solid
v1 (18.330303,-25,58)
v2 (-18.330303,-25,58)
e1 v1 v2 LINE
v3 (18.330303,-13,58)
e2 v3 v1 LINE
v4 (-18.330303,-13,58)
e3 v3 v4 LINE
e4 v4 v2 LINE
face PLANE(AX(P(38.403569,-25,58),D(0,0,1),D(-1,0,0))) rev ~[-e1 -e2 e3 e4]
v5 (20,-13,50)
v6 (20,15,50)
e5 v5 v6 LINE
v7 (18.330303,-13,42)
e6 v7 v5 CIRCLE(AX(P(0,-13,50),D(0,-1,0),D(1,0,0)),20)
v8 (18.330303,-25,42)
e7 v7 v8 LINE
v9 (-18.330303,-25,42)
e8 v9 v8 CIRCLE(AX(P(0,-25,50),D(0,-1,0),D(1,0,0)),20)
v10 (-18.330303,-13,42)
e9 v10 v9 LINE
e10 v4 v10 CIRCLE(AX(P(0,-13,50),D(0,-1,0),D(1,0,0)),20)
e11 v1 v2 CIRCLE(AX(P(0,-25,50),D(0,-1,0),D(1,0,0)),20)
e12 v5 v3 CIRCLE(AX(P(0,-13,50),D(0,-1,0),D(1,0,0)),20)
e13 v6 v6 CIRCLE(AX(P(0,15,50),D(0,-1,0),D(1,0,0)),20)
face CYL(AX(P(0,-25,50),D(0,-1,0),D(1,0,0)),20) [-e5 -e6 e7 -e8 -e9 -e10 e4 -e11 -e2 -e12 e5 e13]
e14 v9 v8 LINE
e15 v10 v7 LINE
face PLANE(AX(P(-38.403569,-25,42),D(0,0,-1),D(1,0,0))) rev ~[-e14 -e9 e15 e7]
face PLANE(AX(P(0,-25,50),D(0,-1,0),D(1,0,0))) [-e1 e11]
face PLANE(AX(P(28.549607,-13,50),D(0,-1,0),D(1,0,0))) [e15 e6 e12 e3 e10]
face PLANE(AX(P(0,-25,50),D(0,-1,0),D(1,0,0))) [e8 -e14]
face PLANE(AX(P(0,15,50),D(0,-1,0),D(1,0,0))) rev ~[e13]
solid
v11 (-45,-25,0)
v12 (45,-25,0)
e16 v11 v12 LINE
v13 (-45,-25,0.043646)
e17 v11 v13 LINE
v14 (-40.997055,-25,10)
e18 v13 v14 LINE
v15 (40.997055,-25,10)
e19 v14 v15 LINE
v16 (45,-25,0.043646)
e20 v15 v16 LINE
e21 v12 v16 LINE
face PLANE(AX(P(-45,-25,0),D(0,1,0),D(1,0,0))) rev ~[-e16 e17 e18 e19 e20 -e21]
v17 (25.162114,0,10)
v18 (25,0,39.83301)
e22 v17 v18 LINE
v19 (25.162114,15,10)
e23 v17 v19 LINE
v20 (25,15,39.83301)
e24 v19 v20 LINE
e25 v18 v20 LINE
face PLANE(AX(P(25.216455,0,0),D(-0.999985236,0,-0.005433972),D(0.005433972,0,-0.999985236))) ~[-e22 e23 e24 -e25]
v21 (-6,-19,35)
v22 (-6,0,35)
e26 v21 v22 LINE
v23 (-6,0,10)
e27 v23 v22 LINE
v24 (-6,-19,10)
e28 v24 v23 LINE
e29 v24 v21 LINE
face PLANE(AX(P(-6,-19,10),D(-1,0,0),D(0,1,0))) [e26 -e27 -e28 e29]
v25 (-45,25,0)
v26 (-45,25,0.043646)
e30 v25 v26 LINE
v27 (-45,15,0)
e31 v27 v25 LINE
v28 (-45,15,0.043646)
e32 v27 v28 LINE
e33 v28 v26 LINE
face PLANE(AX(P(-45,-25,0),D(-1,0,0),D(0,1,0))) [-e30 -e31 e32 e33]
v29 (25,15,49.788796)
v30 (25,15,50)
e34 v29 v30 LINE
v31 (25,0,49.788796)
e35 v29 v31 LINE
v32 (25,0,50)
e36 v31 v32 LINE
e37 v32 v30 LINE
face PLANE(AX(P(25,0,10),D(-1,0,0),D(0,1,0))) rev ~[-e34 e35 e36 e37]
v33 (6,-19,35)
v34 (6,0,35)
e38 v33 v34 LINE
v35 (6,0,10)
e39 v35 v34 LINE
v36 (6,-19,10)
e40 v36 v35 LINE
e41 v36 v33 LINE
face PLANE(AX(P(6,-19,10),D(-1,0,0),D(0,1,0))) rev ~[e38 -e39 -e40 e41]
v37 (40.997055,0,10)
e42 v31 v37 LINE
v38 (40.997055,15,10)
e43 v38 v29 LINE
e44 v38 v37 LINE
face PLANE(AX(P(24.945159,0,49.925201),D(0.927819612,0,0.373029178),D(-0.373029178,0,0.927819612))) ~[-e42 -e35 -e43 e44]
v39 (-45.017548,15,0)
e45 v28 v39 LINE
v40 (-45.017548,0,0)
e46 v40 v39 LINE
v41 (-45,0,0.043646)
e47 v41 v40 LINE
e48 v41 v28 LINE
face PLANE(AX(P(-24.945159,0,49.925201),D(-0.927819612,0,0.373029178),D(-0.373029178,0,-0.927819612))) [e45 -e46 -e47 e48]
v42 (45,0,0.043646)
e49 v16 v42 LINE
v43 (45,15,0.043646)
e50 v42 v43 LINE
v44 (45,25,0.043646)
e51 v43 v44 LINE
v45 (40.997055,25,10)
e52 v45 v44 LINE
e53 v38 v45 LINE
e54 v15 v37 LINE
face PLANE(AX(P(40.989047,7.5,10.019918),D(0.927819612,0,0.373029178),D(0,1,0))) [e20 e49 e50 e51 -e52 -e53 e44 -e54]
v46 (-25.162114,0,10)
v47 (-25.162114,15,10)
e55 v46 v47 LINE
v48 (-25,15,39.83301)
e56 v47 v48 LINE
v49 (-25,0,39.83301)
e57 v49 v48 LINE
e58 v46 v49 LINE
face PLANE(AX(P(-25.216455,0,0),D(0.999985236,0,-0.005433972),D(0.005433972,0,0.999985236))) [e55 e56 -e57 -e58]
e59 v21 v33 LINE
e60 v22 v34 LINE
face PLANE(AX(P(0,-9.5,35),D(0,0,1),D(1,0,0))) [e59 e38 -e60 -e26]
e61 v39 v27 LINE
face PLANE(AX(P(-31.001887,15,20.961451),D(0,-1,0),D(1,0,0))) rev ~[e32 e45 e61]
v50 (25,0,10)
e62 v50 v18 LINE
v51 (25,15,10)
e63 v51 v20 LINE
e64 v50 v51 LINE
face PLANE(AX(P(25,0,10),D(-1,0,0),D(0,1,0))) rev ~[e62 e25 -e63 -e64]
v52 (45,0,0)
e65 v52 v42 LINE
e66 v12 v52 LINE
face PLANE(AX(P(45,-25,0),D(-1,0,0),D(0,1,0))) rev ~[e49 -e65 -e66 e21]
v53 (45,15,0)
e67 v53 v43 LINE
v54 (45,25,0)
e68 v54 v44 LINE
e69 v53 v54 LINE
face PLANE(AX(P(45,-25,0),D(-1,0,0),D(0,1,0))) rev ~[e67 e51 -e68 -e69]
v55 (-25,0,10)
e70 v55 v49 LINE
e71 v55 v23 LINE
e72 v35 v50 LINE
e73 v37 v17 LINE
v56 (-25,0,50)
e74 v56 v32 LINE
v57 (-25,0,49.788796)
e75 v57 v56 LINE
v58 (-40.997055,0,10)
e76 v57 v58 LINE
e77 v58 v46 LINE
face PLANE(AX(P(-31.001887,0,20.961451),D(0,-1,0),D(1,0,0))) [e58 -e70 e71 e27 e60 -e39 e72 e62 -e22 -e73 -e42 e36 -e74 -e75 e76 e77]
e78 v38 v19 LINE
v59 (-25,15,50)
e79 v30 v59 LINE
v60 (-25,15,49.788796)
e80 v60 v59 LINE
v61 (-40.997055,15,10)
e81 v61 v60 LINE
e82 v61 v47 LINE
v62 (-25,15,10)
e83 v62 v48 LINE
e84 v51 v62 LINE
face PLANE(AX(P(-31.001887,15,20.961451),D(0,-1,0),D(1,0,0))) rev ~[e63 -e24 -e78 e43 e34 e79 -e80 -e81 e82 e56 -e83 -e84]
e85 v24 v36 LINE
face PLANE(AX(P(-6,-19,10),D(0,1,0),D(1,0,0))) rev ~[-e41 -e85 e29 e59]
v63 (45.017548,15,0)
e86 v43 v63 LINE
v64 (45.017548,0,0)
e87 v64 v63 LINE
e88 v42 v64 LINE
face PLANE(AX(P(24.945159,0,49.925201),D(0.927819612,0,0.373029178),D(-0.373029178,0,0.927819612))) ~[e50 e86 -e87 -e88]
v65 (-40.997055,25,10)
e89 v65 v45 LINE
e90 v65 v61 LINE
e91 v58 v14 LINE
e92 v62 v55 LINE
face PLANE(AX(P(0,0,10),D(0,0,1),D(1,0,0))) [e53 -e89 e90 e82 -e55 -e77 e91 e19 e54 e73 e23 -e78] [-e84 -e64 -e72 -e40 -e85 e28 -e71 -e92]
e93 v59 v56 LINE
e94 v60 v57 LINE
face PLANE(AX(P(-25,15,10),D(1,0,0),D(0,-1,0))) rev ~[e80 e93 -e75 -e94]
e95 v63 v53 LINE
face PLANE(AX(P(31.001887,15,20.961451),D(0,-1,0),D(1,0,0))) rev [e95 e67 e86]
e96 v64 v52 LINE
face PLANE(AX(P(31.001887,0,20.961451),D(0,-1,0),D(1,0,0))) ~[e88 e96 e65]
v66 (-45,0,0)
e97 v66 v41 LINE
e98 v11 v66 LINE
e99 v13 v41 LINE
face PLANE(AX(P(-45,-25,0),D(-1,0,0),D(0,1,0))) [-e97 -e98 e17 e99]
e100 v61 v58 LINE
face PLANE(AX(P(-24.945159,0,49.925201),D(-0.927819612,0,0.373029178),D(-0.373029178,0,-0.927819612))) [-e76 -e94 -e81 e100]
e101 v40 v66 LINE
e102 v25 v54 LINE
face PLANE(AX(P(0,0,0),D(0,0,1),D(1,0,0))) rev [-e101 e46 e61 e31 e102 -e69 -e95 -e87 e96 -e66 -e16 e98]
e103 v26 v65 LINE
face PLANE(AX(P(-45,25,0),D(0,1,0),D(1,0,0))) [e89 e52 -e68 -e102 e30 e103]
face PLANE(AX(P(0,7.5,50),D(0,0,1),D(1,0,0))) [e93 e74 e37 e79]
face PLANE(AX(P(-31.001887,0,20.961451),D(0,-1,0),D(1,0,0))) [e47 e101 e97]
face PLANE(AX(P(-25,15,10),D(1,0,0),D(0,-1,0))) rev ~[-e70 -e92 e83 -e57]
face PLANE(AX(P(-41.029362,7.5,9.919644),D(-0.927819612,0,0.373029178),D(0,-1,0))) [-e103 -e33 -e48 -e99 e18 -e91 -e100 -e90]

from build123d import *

# Parameters (mm, degrees)
F0_W      = 90
F0_H      = 50
F1_DEPTH  = 10
F2_R      = 20
F3_DEPTH  = 40
F5_DEPTH  = 12
F6_W      = 12
F6_H      = 19
F7_DEPTH  = 25
F9_DEPTH  = 40
F11_DEPTH = 15
F14_DEPTH = 10
F16_DEPTH = 25


with BuildPart() as f1:
    # F0 (on Top) → F1 (new body)
    with BuildSketch(Plane.XY):
        Rectangle(F0_W, F0_H)
    extrude(amount=F1_DEPTH)

    # F6 (on face) → F7 (join)
    with BuildSketch(Plane.XY.offset(10)):
        with Locations((0, -9.5)):
            Rectangle(F6_W, F6_H)
    extrude(amount=F7_DEPTH)

    # F8 (on face) → F9 (join)
    with BuildSketch(Plane.XY.offset(10)):
        Polygon((6, 0), (25, 0), (25, 15), (-25, 15), (-25, 0), (-6, 0), align=None)
    extrude(amount=F9_DEPTH)

    # F10 (on Front) → F11 (join)
    with BuildSketch(Plane.XZ):
        Polygon((-25.21645464, 0), (-24.9451585114, 49.9252006412), (-45.0175479054, 0), align=None)
    extrude(amount=-F11_DEPTH)

    # F12: F1 across plane


with BuildPart() as f3:
    # F2 (on face) → F3 (new body)
    with BuildSketch(Plane.XZ.offset(25)):
        with Locations((0, 50)):
            Circle(F2_R)
    extrude(amount=-F3_DEPTH)

    # F4 (on face) → F5 (cut)
    with BuildSketch(Plane.XZ.offset(25)):
        with BuildLine():
            ThreePointArc((20, 50), (19.5781262586, 45.9138071262), (18.3303027798, 42))
            Line((18.3303027798, 42), (38.403568727, 42))
            Line((38.403568727, 42), (38.403568727, 58))
            Line((38.403568727, 58), (18.3303027798, 58))
            ThreePointArc((18.3303027798, 58), (19.5781262586, 54.0861928738), (20, 50))
        make_face()
        with BuildLine():
            Line((-38.403568727, 58), (-38.403568727, 42))
            Line((-38.403568727, 42), (-18.3303027798, 42))
            ThreePointArc((-18.3303027798, 42), (-20, 50), (-18.3303027798, 58))
            Line((-18.3303027798, 58), (-38.403568727, 58))
        make_face()
        with BuildLine():
            ThreePointArc((-18.3303027798, 58), (-20, 50), (-18.3303027798, 42))
            Line((-18.3303027798, 42), (18.3303027798, 42))
            ThreePointArc((18.3303027798, 42), (19.5781262586, 45.9138071262), (20, 50))
            ThreePointArc((20, 50), (19.5781262586, 54.0861928738), (18.3303027798, 58))
            Line((18.3303027798, 58), (-18.3303027798, 58))
        make_face()
    extrude(amount=-F5_DEPTH, mode=Mode.SUBTRACT)


with BuildPart() as f1_1:
    add(f1.part)
    add(f1.part.mirror(Plane.YZ))

    # F13 (on face) → F14 (cut)
    with BuildSketch(Plane(origin=(-38.7533215674, 0, 15.5807438092), x_dir=(0, -1, 0), z_dir=(-0.9278196121, 0, 0.3730291777))):
        Polygon((33.9928641915, -19.423213931), (33.9928641915, 7.3934104294), (0, 7.3934104294), (0, -6.0149017508), (-15, -6.0149017508), (-15, 7.3934104294), (-48.9928641915, 7.3934104294), (-48.9928641915, -19.423213931), align=None)
    extrude(amount=F14_DEPTH, mode=Mode.SUBTRACT)

    # F15 (on face) → F16 (cut)
    with BuildSketch(Plane(origin=(38.7533215674, 0, 15.5807438092), x_dir=(0, 1, 0), z_dir=(0.9278196121, 0, 0.3730291777))):
        Polygon((0, 9.3338117003), (-31.8076275289, 9.3338117003), (-31.8076275289, -21.363615202), (46.8076275289, -21.363615202), (46.8076275289, 9.3338117003), (15, 9.3338117003), (15, -6.0149017508), (0, -6.0149017508), align=None)
    extrude(amount=F16_DEPTH, mode=Mode.SUBTRACT)


solid = Compound([f3.part, f1_1.part])
